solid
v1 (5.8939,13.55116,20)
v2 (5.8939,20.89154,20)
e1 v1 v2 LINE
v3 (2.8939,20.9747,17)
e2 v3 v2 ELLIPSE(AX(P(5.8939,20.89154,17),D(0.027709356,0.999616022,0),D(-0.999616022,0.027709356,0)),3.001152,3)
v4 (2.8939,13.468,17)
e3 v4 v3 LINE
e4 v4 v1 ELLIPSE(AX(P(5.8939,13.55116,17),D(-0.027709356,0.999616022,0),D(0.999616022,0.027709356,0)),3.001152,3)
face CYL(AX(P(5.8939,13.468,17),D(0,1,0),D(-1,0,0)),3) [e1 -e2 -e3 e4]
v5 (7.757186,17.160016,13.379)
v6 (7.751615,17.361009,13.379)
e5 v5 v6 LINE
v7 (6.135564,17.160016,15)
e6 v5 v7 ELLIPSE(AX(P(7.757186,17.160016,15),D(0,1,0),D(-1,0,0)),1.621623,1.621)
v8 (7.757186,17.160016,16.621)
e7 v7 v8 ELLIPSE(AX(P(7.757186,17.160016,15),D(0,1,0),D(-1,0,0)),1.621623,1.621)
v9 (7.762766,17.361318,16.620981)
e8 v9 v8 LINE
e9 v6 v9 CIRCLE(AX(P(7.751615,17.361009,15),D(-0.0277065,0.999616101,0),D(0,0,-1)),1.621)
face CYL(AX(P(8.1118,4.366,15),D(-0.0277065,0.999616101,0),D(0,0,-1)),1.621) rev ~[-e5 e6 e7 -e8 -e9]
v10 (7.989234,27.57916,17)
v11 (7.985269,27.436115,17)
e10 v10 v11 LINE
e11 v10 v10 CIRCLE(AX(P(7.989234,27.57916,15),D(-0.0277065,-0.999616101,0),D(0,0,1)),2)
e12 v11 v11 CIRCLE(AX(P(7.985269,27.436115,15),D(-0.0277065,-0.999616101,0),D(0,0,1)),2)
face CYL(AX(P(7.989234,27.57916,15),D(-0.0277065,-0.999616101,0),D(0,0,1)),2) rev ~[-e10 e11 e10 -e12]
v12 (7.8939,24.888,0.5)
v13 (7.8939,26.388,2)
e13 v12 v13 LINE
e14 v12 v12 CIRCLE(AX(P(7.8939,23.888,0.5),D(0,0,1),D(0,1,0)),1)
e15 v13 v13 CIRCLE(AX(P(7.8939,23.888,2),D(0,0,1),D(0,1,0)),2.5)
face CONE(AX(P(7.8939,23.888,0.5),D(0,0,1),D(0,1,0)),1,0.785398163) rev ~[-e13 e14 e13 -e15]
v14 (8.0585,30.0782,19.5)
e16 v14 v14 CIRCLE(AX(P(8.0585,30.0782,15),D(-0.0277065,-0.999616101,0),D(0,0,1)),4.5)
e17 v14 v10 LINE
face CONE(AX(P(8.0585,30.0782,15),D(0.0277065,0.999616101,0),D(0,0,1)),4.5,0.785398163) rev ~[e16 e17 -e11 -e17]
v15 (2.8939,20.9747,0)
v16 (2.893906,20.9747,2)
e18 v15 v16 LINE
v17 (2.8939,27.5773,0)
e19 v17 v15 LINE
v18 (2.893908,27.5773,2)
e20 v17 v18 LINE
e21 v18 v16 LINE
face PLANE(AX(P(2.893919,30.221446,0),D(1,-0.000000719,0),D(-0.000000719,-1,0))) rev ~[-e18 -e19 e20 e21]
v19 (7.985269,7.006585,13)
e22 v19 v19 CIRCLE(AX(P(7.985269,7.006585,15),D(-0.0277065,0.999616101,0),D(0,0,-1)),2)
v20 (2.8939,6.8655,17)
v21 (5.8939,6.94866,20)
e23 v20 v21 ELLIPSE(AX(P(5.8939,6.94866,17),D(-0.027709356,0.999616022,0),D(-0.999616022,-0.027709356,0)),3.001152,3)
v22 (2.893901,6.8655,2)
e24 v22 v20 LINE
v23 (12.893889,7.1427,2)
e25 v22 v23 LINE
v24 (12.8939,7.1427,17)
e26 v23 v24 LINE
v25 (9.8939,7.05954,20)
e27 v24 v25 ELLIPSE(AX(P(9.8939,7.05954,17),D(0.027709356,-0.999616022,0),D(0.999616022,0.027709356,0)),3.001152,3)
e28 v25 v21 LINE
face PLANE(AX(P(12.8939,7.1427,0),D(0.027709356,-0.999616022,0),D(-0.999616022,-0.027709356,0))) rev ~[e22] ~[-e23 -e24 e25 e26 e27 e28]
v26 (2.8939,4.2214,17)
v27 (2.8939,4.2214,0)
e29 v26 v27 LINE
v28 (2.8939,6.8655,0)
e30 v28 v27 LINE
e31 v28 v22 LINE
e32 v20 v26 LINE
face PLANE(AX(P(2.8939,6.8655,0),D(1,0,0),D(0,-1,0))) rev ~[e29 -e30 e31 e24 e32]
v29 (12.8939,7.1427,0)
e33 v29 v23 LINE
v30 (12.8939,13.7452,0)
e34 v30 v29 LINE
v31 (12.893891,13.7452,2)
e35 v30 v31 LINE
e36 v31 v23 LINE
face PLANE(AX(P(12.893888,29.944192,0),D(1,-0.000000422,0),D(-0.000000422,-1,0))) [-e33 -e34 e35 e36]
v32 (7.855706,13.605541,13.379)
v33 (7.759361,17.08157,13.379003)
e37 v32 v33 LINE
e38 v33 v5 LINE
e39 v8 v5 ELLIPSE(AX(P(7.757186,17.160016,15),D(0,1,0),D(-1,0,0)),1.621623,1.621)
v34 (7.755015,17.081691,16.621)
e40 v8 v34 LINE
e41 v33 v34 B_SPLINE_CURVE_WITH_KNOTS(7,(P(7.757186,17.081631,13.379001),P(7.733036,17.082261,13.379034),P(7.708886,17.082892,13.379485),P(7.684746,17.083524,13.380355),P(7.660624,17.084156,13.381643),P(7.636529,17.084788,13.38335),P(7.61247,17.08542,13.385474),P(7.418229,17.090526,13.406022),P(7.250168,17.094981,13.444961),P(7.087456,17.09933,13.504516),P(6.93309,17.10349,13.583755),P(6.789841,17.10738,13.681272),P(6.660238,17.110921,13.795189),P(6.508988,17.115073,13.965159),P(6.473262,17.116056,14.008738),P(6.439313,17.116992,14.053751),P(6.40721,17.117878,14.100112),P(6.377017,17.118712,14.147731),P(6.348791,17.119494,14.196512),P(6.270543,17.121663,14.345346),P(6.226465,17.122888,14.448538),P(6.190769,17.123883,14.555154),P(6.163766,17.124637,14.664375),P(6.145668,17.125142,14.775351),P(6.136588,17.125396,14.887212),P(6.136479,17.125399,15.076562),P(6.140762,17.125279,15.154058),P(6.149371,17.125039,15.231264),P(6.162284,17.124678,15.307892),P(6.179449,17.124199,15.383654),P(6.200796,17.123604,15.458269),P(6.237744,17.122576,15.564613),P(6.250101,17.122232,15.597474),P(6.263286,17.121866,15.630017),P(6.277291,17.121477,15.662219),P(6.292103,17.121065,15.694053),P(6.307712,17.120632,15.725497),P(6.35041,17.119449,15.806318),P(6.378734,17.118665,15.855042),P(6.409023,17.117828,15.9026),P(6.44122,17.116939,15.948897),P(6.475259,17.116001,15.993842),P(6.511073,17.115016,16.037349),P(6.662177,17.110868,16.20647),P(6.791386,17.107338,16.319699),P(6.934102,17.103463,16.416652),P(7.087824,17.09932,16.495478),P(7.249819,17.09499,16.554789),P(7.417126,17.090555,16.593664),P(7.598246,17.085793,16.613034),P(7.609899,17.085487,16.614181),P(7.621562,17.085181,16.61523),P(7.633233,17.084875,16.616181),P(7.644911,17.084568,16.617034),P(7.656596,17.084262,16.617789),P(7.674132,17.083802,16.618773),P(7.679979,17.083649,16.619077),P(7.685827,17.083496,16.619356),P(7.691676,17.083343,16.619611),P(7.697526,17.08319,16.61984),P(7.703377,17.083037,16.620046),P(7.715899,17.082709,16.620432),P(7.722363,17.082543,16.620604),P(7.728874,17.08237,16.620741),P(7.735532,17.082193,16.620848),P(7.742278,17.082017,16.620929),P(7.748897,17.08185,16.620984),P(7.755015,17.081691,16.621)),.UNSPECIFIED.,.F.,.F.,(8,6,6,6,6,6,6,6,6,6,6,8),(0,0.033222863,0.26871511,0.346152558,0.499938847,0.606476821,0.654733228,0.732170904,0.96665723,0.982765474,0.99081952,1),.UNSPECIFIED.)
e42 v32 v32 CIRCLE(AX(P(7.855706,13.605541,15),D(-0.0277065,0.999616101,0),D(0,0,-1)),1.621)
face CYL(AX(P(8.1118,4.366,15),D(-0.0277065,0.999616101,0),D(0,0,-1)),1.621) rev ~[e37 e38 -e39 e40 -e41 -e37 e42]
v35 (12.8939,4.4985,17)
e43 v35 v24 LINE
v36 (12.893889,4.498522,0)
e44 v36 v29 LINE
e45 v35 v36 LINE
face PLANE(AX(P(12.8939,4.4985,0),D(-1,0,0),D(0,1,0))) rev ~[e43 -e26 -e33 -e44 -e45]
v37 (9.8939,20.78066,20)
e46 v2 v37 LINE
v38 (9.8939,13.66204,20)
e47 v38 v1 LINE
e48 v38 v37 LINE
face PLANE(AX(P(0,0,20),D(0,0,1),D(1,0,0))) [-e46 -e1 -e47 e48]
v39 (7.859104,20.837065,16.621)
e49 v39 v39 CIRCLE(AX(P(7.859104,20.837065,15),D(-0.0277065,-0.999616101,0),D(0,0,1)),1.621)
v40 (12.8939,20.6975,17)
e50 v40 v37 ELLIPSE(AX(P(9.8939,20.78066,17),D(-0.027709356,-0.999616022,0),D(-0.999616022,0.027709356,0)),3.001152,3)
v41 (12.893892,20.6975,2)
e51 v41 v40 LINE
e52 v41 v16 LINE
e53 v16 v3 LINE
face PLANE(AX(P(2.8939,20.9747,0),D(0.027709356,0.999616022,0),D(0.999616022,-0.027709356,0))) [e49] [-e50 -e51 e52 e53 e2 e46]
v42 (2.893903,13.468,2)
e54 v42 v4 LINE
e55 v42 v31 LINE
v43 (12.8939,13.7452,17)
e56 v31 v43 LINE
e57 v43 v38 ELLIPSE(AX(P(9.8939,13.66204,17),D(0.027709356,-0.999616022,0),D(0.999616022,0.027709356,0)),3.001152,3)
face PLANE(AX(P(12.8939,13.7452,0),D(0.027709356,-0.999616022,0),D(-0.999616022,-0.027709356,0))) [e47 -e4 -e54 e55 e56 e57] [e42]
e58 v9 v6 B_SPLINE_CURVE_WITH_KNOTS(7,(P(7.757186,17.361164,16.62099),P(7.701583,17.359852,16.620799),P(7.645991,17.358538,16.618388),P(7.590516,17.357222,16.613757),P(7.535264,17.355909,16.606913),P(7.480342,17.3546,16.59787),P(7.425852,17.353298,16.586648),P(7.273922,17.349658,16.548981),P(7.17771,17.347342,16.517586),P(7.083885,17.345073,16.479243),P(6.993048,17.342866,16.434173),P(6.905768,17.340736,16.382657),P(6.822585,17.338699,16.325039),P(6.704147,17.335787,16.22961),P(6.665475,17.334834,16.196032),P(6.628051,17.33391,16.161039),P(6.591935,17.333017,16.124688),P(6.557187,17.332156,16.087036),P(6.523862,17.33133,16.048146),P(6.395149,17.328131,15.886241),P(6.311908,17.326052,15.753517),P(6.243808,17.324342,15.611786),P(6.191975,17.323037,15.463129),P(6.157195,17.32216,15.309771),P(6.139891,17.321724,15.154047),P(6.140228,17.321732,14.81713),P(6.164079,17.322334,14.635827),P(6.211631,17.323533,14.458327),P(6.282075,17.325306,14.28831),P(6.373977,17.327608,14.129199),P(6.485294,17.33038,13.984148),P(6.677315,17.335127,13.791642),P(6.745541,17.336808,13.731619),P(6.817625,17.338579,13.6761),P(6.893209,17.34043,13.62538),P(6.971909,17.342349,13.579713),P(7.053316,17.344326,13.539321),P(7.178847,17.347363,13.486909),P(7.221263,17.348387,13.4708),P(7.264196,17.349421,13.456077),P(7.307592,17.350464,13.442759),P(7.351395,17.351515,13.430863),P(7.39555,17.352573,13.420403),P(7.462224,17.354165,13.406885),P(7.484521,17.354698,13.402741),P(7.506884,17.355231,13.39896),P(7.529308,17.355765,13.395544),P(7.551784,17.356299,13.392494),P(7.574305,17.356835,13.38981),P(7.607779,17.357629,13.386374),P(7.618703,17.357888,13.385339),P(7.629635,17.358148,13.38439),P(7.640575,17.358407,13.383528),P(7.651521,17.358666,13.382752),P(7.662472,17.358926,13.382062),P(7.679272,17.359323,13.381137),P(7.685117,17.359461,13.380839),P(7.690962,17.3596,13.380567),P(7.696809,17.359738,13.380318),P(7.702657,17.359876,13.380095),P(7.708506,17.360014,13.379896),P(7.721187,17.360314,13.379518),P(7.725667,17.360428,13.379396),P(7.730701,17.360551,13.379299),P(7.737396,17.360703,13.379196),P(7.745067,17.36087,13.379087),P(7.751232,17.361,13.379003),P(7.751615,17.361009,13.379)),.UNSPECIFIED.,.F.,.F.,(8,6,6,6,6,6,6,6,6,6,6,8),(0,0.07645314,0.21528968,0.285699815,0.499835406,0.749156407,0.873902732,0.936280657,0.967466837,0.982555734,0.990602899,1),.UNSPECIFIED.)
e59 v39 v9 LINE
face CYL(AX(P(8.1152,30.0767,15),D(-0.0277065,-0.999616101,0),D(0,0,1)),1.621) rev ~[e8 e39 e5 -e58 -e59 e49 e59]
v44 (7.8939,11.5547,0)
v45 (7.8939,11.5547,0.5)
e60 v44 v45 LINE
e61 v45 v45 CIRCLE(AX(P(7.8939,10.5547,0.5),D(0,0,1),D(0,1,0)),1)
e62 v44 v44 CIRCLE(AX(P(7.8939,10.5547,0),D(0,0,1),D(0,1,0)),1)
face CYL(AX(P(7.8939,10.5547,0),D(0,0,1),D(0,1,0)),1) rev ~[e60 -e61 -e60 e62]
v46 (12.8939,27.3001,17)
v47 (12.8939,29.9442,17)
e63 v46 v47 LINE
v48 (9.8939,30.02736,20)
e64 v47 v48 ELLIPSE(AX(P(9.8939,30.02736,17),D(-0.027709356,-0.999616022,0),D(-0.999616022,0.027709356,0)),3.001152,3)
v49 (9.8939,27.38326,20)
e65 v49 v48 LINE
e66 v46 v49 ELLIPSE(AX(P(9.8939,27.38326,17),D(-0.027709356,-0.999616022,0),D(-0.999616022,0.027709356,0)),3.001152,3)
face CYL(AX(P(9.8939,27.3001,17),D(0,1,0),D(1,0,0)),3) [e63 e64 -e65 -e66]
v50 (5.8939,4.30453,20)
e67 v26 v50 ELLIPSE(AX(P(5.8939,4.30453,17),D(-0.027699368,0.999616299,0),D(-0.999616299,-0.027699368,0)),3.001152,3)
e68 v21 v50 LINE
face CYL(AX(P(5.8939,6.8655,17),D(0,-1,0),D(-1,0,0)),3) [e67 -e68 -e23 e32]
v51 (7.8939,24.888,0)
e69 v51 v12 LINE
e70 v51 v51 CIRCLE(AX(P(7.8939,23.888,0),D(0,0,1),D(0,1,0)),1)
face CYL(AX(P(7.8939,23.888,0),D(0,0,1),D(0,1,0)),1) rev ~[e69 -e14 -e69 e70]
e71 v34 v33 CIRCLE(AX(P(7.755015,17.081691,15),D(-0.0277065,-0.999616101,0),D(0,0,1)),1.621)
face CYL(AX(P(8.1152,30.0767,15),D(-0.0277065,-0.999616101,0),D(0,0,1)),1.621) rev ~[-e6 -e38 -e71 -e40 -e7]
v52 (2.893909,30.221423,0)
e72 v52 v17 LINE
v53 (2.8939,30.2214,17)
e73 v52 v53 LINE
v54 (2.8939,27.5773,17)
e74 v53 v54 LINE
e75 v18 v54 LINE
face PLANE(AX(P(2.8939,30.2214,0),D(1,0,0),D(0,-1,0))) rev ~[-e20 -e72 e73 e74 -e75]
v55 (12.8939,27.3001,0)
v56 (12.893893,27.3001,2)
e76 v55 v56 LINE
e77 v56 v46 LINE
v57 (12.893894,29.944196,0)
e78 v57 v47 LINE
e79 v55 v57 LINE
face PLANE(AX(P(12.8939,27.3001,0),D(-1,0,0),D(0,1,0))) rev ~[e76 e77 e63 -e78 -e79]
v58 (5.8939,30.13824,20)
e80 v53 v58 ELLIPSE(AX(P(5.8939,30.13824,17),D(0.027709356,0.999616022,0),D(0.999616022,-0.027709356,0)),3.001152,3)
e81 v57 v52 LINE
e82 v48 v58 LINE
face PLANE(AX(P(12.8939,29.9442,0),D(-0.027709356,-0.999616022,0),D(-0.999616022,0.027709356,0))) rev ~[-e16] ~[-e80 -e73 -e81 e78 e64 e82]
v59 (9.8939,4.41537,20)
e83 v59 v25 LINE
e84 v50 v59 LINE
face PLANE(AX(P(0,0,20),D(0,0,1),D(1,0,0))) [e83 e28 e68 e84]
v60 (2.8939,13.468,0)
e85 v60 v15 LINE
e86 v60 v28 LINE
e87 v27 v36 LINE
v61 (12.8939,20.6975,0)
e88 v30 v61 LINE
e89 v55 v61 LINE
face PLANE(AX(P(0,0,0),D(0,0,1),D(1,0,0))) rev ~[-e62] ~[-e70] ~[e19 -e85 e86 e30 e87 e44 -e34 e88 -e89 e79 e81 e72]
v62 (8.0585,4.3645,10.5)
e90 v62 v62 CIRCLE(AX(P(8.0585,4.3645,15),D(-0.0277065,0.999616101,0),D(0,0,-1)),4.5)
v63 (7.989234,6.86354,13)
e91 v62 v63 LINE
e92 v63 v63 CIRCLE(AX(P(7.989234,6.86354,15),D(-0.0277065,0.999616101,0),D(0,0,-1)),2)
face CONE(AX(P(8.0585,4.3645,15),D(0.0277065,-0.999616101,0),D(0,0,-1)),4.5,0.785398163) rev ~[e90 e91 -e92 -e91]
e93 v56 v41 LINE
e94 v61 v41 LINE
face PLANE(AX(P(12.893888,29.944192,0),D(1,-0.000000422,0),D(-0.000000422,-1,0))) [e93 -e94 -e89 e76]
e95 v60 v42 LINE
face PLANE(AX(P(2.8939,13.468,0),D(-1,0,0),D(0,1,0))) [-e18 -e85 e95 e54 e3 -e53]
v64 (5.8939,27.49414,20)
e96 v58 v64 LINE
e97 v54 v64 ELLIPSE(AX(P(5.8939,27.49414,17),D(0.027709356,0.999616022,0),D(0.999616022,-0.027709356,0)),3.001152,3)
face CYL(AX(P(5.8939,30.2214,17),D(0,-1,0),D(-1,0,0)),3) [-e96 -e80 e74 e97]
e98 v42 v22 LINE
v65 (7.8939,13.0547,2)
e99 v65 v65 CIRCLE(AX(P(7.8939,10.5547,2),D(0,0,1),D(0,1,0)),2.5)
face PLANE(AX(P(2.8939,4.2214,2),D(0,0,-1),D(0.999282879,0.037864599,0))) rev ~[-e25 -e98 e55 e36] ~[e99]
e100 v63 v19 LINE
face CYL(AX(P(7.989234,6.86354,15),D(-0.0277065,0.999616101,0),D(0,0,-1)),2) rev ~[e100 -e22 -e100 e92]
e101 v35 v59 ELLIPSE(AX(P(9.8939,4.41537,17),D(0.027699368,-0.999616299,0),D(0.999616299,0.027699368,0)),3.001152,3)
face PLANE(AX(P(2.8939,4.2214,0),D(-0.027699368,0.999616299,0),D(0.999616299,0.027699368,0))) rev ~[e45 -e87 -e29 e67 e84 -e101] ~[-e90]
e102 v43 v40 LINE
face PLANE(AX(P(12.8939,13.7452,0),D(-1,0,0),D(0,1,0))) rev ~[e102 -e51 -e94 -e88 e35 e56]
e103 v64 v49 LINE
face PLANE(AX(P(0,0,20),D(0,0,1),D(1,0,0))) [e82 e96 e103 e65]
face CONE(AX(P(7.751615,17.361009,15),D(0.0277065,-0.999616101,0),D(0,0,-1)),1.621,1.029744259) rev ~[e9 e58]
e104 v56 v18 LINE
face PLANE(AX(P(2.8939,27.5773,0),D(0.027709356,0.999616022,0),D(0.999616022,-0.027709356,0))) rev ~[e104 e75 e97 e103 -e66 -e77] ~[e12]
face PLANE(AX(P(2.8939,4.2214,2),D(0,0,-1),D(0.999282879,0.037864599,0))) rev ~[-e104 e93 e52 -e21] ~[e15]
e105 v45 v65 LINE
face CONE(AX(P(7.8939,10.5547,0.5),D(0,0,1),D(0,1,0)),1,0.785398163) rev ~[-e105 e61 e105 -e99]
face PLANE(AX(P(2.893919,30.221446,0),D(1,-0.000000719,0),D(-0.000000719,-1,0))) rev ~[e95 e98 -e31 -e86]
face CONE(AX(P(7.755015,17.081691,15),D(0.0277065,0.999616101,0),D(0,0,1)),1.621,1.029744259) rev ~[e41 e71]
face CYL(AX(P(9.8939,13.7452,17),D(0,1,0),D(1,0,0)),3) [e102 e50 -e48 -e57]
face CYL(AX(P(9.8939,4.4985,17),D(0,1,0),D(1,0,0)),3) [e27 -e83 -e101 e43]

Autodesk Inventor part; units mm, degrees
ref_plane "YZ Plane" through (0, 0, 0) normal (1, 0, 0) x (0, 1, 0)
ref_plane "XZ Plane" through (0, 0, 0) normal (0, 1, 0) x (-1, 0, 0)
ref_plane "XY Plane" through (0, 0, 0) normal (0, 0, 1) x (1, 0, 0)
sketch "Skizze1" plane through (0, 0, 0) normal (0, 0, 1) x (1, 0, 0)
  line L0 (12.8939, 29.9442) -> (2.8939, 30.2214)
  line L1 (2.8939, 30.2214) -> (2.8939, 27.5773)
  line L2 (2.8939, 27.5773) -> (12.8939, 27.3001)
  line L3 (12.8939, 27.3001) -> (12.8939, 29.9442)
  line L4 (12.8939, 7.1427) -> (2.8939, 6.8655)
  line L5 (2.8939, 6.8655) -> (2.8939, 4.2214)
  line L6 (2.8939, 4.2214) -> (12.8939, 4.4985)
  line L7 (12.8939, 4.4985) -> (12.8939, 7.1427)
  line L8 (2.8939, 20.9747) -> (12.8939, 20.6975)
  line L9 (12.8939, 13.7452) -> (2.8939, 13.468)
  line L10 (16.8904, 10.5547) -> (7.8939, 10.3054) construction
  line L11 (16.8904, 23.888) -> (7.8939, 24.1374) construction
  line L12 (16.8904, 10.5547) -> (16.8904, 23.888) construction
  line L13 (2.8939, 20.9747) -> (12.8939, 27.3001) construction
  line L14 (2.8939, 13.468) -> (12.8939, 7.1427) construction
  line L15 (2.8939, 13.468) -> (2.8939, 20.9747)
  line L16 (12.8939, 13.7452) -> (12.8939, 20.6975)
  point P0 (7.8939, 7.0041)
  dimension "d36" = 9
  dimension "d37" = 13.3333
  dimension "d38" = 91.588
  dimension "d39" = 91.588
  dimension "d40" = 10
  dimension "d41" = 6.6
  dimension "d42" = 6.6
  dimension "d43" = 13.8321
  dimension "d58" = 26
extrude "Extrusion1" add sketch "Skizze1" along normal blind 20
fillet "Rundung1" radius 3 6 edges at (12.8939, 5.8206, 20) (12.8939, 28.6221, 20) (2.8939, 28.8993, 20) (2.8939, 5.5434, 20) (12.8939, 17.2214, 20) (2.8939, 17.2214, 20)
sketch "Skizze4" plane through (2.8939, 22.0416, 0) normal (0, 0, 1) x (1, 0, 0)
  line L0 (9.5, -17.8202) -> (0.5, -17.8202) construction
  line L1 (7, 7.9858) -> (3, 8.0966) construction
  line L2 (5, -11.7363) -> (5, -11.4869) construction
  line L3 (5, 1.8464) -> (5, 2.0958) construction
  dimension "d59" = 13.3333
sketch "Skizze6" plane through (2.8939, 4.2214, 0) normal (0, 0, -1) x (0.9992829, 0.0378646, 0)
  line L0 (10.9668, -25.3257) -> (0.9845, -25.9814) projected
  line L1 (0, 0) -> (10.0033, 0.1017) projected
  line L2 (0.9845, -25.9814) -> (0, 0)
  line L3 (10.9668, -25.3257) -> (10.0033, 0.1017)
extrude "Extrusion3" add sketch "Skizze6" against normal blind 2
hole "Bohrung4" at (7.8939, 10.5547, 0) at (7.8939, 23.888, 0) direction (0, 0, 1) diameter 2 end through all
chamfer "Fasen1" distance 1.5 angle 45 2 edges at (7.8939, 22.888, 2) (7.8939, 9.5547, 2)
sketch "Skizze7" plane through (12.8939, 4.4985, 0) normal (0.0277065, -0.9996161, 0) x (0.9996161, 0.0277065, 0)
  line L0 (-4.8372, 0) -> (-4.8372, 15) construction
  point P0 (-13.0135, 0)
  dimension "d60" = 15
hole "Bohrung5" at (8.0585, 4.3645, 15) direction (-0.0277065, 0.9996161, 0) diameter 4 depth 2.6431 countersink diameter 9 countersink angle 90
sketch "Skizze8" plane through (12.8939, 4.4985, 0) normal (0.0277065, -0.9996161, 0) x (0.9996161, 0.0277065, 0)
  circle A0 centre (-4.7839, 15) radius 2.0011 projected
  point P0 (-13.0135, 0)
hole "Bohrung6" at (8.1118, 4.366, 15) direction (-0.0277065, 0.9996161, 0) diameter 3.242 depth 13 tip angle 118 thread size "M4x0.7" class "6H" standard "ANSI Metric M Profile"
sketch "Skizze9" plane through (2.8939, 30.2214, 17) normal (0.0277065, 0.9996161, 0) x (0.9996161, -0.0277065, 0)
  line L0 (5.1666, 17) -> (5.1666, 2) construction
  point P0 (-2.0554, 17)
  dimension "d75" = 15
hole "Bohrung7" at (8.0585, 30.0782, 15) direction (-0.0277065, -0.9996161, 0) diameter 4 depth 2.6431 countersink diameter 9 countersink angle 90
sketch "Skizze10" plane through (2.8939, 30.2214, 17) normal (0.0277065, 0.9996161, 0) x (0.9996161, -0.0277065, 0)
  circle A0 centre (5.2233, 2) radius 2.0011 projected
  point P0 (-2.0554, 17)
hole "Bohrung8" at (8.1152, 30.0767, 15) direction (-0.0277065, -0.9996161, 0) diameter 3.242 depth 13 tip angle 118 thread size "M4x0.7" class "6H" standard "ANSI Metric M Profile"
properties part number "HalterUmlenkrolleDPL" material "PC/ABS-Kunststoff, 3DDruck, PLA"
